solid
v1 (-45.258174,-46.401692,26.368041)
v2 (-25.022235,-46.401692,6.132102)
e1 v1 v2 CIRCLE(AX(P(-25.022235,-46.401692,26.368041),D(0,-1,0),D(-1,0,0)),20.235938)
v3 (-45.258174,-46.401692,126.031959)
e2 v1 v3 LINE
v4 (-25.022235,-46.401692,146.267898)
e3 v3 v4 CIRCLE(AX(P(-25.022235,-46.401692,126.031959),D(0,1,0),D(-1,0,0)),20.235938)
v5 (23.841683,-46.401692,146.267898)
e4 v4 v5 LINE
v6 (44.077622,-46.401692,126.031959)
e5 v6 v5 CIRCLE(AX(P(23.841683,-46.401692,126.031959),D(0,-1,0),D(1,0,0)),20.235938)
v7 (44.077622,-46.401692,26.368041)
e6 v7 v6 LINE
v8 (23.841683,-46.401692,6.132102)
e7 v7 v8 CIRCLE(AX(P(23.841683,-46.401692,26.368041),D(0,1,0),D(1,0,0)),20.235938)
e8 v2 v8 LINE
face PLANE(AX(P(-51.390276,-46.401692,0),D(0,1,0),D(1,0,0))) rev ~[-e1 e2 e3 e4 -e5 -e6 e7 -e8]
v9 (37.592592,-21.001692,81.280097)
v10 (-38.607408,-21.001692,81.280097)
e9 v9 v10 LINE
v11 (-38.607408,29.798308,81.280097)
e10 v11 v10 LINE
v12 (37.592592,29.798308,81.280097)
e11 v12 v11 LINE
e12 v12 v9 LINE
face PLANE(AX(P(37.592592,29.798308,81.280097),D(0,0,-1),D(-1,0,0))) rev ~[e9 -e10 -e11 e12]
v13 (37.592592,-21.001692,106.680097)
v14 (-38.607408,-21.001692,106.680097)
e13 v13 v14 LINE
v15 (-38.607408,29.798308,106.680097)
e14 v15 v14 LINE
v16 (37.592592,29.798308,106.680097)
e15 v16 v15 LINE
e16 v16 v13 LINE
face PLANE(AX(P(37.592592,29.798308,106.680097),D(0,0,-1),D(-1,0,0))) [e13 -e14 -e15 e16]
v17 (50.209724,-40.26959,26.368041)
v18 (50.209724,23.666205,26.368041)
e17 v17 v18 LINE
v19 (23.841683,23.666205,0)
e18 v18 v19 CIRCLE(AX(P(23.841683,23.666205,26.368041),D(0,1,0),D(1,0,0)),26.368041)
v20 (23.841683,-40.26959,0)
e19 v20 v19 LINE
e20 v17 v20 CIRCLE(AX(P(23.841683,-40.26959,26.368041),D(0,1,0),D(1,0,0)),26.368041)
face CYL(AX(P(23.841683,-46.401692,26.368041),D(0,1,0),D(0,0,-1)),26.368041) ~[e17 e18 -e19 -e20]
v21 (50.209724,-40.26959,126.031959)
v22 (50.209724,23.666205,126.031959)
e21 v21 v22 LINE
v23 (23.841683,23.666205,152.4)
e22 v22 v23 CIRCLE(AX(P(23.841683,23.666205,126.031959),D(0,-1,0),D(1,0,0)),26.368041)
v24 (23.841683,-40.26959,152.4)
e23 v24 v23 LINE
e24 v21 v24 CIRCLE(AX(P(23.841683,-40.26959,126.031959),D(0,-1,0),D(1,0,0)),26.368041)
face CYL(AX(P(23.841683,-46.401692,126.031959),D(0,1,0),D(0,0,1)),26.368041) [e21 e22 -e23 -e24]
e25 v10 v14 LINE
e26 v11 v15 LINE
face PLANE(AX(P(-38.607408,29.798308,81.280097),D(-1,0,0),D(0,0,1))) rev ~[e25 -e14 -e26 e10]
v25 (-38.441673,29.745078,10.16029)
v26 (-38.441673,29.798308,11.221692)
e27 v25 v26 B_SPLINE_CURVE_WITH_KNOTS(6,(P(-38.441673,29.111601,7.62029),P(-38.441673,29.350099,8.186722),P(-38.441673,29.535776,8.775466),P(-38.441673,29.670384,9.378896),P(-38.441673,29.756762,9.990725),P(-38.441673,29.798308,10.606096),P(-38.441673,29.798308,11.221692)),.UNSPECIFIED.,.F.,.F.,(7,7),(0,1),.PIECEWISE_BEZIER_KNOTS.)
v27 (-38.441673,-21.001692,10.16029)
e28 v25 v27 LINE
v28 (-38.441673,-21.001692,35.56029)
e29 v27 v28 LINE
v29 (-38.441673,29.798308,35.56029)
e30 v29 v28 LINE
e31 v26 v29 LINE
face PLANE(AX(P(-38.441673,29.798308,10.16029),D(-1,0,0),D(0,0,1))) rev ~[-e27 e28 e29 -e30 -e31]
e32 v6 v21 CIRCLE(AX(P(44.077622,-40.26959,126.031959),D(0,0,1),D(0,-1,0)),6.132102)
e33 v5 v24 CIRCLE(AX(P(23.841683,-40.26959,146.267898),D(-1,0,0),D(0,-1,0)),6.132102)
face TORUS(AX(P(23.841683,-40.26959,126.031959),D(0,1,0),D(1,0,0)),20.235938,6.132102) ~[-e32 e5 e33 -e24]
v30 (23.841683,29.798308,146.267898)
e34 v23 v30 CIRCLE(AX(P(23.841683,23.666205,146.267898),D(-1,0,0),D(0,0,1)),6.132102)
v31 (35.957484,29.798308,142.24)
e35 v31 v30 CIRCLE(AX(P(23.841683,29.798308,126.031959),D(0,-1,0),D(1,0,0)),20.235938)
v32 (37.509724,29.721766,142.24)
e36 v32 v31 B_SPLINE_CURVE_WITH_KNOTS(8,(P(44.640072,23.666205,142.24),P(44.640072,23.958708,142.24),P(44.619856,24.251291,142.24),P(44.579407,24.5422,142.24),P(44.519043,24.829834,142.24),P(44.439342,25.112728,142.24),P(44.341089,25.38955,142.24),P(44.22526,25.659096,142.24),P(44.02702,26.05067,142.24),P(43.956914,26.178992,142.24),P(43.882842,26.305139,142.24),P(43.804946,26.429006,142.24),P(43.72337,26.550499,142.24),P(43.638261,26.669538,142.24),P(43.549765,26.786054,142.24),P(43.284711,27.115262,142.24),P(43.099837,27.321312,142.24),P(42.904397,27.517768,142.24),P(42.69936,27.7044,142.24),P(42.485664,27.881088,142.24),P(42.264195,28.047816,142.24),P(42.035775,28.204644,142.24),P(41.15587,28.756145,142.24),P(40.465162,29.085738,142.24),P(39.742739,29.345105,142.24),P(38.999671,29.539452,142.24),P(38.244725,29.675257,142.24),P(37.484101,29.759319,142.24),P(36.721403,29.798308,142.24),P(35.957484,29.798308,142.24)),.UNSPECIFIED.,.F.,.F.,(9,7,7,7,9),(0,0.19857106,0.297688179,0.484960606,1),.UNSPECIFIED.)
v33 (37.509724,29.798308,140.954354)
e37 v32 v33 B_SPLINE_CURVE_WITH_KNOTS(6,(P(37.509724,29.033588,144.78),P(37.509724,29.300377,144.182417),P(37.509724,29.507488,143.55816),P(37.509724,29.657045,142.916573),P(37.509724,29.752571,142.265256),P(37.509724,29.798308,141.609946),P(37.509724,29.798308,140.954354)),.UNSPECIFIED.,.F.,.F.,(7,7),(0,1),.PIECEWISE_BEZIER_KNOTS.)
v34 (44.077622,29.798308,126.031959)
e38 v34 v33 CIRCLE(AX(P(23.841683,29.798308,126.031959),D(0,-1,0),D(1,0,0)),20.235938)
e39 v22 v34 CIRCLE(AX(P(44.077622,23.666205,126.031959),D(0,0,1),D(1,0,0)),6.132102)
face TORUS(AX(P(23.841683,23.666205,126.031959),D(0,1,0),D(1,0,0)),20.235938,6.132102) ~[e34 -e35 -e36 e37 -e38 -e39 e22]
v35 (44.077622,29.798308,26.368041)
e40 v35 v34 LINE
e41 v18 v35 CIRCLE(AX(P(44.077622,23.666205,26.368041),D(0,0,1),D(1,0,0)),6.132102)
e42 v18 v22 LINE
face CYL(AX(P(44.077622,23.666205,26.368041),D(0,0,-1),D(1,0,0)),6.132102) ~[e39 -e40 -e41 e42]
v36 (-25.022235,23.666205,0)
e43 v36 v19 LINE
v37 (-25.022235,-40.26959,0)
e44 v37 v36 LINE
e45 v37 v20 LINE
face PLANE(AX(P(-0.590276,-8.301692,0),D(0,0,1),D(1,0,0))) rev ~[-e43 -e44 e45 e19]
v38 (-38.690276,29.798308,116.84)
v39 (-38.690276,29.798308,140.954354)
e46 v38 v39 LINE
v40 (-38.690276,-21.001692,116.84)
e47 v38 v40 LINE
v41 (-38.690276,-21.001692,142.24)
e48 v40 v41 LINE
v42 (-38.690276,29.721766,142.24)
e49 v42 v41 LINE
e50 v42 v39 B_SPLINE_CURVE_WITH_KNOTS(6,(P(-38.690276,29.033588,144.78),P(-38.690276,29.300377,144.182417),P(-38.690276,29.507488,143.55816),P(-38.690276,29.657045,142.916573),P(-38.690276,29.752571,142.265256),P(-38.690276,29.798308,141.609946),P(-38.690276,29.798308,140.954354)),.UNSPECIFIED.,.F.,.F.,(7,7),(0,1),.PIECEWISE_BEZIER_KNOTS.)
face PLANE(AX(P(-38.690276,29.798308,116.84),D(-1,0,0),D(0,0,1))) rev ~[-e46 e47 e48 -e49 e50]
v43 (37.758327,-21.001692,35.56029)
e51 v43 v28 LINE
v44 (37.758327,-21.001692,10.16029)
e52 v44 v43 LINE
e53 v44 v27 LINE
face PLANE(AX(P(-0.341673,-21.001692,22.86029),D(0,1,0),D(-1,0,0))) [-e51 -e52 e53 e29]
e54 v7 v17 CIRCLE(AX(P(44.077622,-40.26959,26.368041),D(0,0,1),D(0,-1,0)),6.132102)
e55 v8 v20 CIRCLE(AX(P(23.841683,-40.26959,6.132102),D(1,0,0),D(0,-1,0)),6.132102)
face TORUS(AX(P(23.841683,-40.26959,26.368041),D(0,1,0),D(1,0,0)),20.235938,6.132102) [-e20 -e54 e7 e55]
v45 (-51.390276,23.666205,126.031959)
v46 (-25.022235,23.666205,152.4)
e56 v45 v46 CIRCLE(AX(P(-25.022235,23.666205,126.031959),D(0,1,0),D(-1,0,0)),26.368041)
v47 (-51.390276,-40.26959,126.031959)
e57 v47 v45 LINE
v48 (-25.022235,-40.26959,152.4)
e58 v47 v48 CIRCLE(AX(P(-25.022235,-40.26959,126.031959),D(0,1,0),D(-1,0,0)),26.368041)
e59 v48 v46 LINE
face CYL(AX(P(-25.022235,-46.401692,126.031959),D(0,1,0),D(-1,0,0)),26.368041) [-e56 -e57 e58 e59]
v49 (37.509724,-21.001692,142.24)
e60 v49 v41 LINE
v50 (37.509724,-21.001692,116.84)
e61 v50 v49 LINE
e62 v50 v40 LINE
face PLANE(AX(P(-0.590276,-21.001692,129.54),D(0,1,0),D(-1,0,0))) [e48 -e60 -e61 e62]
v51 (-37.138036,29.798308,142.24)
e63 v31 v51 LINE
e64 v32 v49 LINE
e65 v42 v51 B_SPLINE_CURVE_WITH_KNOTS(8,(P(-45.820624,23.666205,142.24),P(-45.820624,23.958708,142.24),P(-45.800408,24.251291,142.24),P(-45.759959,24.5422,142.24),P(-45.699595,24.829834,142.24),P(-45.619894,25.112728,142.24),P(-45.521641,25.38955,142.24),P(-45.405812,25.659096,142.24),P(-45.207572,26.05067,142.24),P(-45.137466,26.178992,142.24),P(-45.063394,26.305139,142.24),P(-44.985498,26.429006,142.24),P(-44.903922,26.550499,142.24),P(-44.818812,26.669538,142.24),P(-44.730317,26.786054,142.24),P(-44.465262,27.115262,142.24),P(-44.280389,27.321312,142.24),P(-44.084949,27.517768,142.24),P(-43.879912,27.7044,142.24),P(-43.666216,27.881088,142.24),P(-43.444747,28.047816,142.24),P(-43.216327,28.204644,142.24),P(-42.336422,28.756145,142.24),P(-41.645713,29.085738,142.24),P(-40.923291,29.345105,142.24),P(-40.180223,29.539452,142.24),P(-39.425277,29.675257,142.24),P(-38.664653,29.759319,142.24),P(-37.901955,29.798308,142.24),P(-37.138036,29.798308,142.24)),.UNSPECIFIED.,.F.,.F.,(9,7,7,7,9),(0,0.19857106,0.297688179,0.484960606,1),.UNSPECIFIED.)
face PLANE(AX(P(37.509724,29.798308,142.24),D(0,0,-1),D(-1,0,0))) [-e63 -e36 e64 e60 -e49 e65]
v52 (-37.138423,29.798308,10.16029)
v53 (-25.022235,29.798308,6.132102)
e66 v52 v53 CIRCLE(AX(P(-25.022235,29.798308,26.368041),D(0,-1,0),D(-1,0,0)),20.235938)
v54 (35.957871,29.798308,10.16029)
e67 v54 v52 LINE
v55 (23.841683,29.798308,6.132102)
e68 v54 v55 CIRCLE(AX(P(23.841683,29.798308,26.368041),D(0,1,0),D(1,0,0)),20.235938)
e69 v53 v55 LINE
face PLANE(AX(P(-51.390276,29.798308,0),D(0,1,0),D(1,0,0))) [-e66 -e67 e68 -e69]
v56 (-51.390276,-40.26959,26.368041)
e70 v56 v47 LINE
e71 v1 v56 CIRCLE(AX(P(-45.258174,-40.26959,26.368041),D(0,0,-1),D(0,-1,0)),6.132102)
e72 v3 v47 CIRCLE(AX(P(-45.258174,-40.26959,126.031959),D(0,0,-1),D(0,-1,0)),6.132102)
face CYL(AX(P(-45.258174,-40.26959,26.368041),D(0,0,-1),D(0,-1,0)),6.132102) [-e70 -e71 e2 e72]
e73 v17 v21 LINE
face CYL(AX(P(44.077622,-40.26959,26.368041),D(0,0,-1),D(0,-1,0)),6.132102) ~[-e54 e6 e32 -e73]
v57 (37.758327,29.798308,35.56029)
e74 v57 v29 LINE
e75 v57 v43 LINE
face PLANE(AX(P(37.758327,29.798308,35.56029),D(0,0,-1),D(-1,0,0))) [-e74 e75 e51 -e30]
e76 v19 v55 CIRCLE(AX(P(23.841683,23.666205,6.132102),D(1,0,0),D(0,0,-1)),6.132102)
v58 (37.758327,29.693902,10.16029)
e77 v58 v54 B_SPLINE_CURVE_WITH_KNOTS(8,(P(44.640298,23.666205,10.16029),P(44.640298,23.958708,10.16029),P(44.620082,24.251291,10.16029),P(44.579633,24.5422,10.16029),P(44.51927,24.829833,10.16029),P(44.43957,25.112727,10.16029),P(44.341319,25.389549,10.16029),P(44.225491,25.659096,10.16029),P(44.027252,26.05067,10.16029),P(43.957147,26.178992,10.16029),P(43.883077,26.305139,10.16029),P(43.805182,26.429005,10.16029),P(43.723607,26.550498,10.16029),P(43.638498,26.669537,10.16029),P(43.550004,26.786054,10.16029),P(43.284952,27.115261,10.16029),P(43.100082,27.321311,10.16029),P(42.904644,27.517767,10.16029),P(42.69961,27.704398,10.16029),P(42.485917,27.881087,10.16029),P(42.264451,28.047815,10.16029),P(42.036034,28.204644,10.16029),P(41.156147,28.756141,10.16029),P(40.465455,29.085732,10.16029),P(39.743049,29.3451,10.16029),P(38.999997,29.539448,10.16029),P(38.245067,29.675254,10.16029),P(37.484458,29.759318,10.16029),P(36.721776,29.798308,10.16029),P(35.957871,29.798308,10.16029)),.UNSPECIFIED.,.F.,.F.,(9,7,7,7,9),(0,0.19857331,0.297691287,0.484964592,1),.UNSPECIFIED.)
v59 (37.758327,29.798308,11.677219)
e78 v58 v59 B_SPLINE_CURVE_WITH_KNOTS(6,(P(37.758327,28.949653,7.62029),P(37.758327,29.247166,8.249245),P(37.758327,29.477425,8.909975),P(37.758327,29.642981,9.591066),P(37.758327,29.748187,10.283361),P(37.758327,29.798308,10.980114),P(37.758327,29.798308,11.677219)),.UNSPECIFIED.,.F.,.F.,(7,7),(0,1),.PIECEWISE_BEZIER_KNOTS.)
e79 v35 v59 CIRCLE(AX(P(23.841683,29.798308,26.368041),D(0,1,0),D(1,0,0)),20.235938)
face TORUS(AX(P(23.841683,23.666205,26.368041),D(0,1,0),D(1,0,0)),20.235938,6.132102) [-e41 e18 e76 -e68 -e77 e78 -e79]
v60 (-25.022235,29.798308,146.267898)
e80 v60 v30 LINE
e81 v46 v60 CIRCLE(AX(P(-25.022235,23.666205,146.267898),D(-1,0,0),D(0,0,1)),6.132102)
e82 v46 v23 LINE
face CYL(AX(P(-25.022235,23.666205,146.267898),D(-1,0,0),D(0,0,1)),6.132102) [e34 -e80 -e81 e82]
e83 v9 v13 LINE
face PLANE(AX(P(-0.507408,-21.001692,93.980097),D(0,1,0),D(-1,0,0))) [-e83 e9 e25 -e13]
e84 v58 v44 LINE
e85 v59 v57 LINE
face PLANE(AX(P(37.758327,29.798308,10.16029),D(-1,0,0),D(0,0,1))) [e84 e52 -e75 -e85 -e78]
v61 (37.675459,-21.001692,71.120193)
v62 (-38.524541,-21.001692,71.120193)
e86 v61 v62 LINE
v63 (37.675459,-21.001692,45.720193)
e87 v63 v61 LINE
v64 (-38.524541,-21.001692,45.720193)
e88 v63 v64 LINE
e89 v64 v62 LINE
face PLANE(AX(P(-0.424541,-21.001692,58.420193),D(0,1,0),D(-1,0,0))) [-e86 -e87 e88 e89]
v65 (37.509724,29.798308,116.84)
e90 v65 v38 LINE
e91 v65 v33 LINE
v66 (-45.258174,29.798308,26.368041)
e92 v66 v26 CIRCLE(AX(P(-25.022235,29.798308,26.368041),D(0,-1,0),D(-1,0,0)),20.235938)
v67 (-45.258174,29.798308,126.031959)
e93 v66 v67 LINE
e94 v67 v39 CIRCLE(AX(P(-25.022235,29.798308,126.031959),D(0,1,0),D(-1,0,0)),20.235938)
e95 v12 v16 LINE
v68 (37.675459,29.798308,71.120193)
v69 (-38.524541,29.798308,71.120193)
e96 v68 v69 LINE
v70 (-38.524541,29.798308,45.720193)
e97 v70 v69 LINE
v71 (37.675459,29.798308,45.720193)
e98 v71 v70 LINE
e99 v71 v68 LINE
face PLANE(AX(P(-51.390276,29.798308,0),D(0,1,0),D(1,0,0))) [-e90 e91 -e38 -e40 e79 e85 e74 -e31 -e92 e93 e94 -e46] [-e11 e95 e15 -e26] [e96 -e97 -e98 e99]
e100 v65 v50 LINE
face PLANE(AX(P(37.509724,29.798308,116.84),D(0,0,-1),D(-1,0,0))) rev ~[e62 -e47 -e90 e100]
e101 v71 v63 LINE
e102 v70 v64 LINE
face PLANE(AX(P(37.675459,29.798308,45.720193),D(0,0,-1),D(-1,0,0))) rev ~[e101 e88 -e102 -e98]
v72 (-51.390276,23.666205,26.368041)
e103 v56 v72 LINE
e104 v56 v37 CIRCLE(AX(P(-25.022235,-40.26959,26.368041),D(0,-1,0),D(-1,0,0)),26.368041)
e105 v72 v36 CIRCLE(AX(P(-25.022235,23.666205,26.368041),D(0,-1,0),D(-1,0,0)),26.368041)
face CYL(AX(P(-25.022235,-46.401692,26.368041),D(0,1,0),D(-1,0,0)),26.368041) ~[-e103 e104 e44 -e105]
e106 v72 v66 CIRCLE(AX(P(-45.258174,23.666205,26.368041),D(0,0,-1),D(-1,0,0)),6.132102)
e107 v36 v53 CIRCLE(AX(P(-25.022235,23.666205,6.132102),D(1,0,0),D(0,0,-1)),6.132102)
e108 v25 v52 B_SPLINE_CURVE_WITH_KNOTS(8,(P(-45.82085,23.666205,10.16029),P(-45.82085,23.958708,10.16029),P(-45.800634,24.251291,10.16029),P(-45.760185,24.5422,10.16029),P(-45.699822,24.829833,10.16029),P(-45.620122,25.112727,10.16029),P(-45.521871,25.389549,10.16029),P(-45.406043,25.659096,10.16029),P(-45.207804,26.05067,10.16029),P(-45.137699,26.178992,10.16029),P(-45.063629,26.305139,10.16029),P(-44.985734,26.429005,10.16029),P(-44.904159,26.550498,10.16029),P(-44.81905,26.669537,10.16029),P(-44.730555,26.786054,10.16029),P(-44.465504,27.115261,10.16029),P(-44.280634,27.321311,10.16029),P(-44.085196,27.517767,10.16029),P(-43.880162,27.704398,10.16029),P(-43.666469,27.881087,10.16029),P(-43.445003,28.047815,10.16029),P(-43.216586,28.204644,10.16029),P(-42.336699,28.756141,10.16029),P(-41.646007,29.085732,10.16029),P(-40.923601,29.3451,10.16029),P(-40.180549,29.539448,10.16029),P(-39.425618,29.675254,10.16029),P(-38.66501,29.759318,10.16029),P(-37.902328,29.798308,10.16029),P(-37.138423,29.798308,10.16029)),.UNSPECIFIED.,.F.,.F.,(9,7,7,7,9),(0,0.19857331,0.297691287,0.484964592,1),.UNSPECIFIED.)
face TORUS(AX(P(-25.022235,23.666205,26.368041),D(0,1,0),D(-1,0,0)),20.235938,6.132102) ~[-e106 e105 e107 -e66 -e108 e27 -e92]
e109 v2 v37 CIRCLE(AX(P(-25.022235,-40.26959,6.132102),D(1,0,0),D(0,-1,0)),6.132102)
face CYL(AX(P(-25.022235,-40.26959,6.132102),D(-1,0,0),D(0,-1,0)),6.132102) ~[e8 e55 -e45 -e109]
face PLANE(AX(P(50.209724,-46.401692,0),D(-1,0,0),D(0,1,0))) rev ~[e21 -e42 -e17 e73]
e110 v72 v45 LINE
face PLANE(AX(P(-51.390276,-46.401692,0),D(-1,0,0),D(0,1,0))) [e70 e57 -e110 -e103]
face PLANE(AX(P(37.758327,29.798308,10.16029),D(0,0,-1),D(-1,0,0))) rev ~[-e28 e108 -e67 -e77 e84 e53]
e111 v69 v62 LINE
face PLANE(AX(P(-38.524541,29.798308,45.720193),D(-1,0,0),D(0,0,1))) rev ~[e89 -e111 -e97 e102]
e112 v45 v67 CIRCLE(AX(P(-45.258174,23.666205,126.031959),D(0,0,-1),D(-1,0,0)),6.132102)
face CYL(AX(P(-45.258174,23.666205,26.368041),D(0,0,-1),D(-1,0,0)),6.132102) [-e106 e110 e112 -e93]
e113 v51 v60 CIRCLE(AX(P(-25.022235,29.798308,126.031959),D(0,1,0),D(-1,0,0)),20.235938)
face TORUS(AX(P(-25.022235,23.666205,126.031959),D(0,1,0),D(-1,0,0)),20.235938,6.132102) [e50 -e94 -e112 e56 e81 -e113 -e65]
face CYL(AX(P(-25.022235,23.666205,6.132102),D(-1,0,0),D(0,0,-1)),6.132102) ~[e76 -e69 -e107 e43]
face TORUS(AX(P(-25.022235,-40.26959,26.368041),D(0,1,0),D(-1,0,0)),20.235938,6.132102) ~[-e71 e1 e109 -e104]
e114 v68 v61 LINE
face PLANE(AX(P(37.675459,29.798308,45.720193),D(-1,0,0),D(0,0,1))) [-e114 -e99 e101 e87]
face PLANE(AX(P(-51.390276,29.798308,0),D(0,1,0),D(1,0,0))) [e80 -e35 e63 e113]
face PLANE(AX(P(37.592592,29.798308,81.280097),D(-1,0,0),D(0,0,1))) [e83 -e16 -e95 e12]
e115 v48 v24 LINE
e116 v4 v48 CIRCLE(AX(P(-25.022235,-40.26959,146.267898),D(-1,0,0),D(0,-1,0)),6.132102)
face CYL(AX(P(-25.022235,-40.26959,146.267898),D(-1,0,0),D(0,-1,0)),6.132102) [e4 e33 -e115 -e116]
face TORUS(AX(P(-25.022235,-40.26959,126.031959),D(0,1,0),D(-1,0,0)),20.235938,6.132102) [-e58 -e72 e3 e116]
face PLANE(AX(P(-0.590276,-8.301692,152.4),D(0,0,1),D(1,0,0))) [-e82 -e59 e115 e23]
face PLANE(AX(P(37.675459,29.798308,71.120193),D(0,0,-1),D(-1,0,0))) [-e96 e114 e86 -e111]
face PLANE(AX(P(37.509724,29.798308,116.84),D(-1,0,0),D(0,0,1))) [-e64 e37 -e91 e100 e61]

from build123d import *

# Parameters (mm, degrees)
F0_W         = 101.6
F0_H         = 76.2
F1_DEPTH     = 152.4
F2_W         = 76.2
F2_H         = 25.4
F3_DEPTH     = 50.8
F4_R         = 26.3680405282
F5_T1_DEPTH  = 48.8639189435
F5_T3_DEPTH  = 99.6639189435
F5_T6_ANGLE  = 90
F5_T8_ANGLE  = 90
F5_T10_ANGLE = 90
F5_T12_ANGLE = 90
F5_T14_ANGLE = 90
F5_T16_ANGLE = 90
F5_T18_ANGLE = 90
F5_T20_ANGLE = 90


# Not quite as in the source:
# - a fillet or chamfer that OpenCascade refuses, or shapes differently, is made with other operations: its cross-section is extruded or revolved along the edge and cut away or added


with BuildPart() as f1:
    # F0 (on Top) → F1 (new body)
    with BuildSketch(Plane.XY):
        with Locations((-0.5902759731, -8.3016921655)):
            Rectangle(F0_W, F0_H)
    extrude(amount=F1_DEPTH)

    # F2 (on face) → F3 (cut)
    with BuildSketch(Plane(origin=(0, 29.7983078345, 0), x_dir=(-1, 0, 0), z_dir=(0, 1, 0))):
        with Locations((0.5902759731, 129.54)):
            Rectangle(F2_W, F2_H)
        with Locations((0.5074083115, 93.9800965559)):
            Rectangle(F2_W, F2_H)
        with Locations((0.42454065, 58.4201931119)):
            Rectangle(F2_W, F2_H)
        with Locations((0.3416729884, 22.8602896678)):
            Rectangle(F2_W, F2_H)
    extrude(amount=-F3_DEPTH, mode=Mode.SUBTRACT)

    # F4
    f4_edges = [f1.edges().sort_by_distance(p)[0] for p in [
        (-51.390276, -8.301692, 152.4),
        (50.209724, -8.301692, 152.4),
        (-51.390276, -8.301692, 0),
        (50.209724, -8.301692, 0),
    ]]
    fillet(f4_edges, radius=F4_R)

    # F5: fillet of radius 6.1321024484 on 16 edges, made by hand

    # F5_s2 → F5_t1 (cut)
    with BuildSketch(Plane.YZ.offset(-25.0222354448)):
        with BuildLine():
            ThreePointArc((23.6662053861, 152.4), (28.0022566103, 150.6039487758), (29.7983078345, 146.2678975516))
            Line((29.7983078345, 146.2678975516), (29.7983078345, 152.4))
            Line((29.7983078345, 152.4), (23.6662053861, 152.4))
        make_face()
        with BuildLine():
            ThreePointArc((-46.4016921655, 146.2678975516), (-44.6056409413, 150.6039487758), (-40.2695897171, 152.4))
            Line((-40.2695897171, 152.4), (-46.4016921655, 152.4))
            Line((-46.4016921655, 152.4), (-46.4016921655, 146.2678975516))
        make_face()
        with BuildLine():
            ThreePointArc((23.6662053861, 0), (28.0022566103, 1.7960512242), (29.7983078345, 6.1321024484))
            Line((29.7983078345, 6.1321024484), (29.7983078345, 0))
            Line((29.7983078345, 0), (23.6662053861, 0))
        make_face()
        with BuildLine():
            ThreePointArc((-46.4016921655, 6.1321024484), (-44.6056409413, 1.7960512242), (-40.2695897171, 0))
            Line((-40.2695897171, 0), (-46.4016921655, 0))
            Line((-46.4016921655, 0), (-46.4016921655, 6.1321024484))
        make_face()
    extrude(amount=F5_T1_DEPTH, mode=Mode.SUBTRACT)

    # F5_s4 → F5_t3 (cut)
    with BuildSketch(Plane.XY.offset(26.3680405282)):
        with BuildLine():
            ThreePointArc((-45.2581735247, -46.4016921655), (-49.5942247489, -44.6056409413), (-51.3902759731, -40.2695897171))
            Line((-51.3902759731, -40.2695897171), (-51.3902759731, -46.4016921655))
            Line((-51.3902759731, -46.4016921655), (-45.2581735247, -46.4016921655))
        make_face()
        with BuildLine():
            ThreePointArc((44.0776215785, -46.4016921655), (48.4136728027, -44.6056409413), (50.2097240269, -40.2695897171))
            Line((50.2097240269, -40.2695897171), (50.2097240269, -46.4016921655))
            Line((50.2097240269, -46.4016921655), (44.0776215785, -46.4016921655))
        make_face()
        with BuildLine():
            ThreePointArc((-51.3902759731, 23.6662053861), (-49.5942247489, 28.0022566103), (-45.2581735247, 29.7983078345))
            Line((-45.2581735247, 29.7983078345), (-51.3902759731, 29.7983078345))
            Line((-51.3902759731, 29.7983078345), (-51.3902759731, 23.6662053861))
        make_face()
        with BuildLine():
            ThreePointArc((50.2097240269, 23.6662053861), (48.4136728027, 28.0022566103), (44.0776215785, 29.7983078345))
            Line((44.0776215785, 29.7983078345), (50.2097240269, 29.7983078345))
            Line((50.2097240269, 29.7983078345), (50.2097240269, 23.6662053861))
        make_face()
    extrude(amount=F5_T3_DEPTH, mode=Mode.SUBTRACT)

    # F5_s5 → F5_t6 (revolve, cut)
    with BuildSketch(Plane.XY.offset(26.3680405282)):
        with BuildLine():
            ThreePointArc((-45.2581735247, -46.4016921655), (-49.5942247489, -44.6056409413), (-51.3902759731, -40.2695897171))
            Line((-51.3902759731, -40.2695897171), (-51.3902759731, -46.4016921655))
            Line((-51.3902759731, -46.4016921655), (-45.2581735247, -46.4016921655))
        make_face()
    revolve(axis=Axis((-25.0222354448, -46.4016921655, 26.3680405282), (0, -1, 0)), revolution_arc=F5_T6_ANGLE, mode=Mode.SUBTRACT)

    # F5_s7 → F5_t8 (revolve, cut)
    with BuildSketch(Plane.XY.offset(126.0319594718)):
        with BuildLine():
            ThreePointArc((-45.2581735247, -46.4016921655), (-49.5942247489, -44.6056409413), (-51.3902759731, -40.2695897171))
            Line((-51.3902759731, -40.2695897171), (-51.3902759731, -46.4016921655))
            Line((-51.3902759731, -46.4016921655), (-45.2581735247, -46.4016921655))
        make_face()
    revolve(axis=Axis((-25.0222354448, -46.4016921655, 126.0319594718), (0, 1, 0)), revolution_arc=F5_T8_ANGLE, mode=Mode.SUBTRACT)

    # F5_s9 → F5_t10 (revolve, cut)
    with BuildSketch(Plane.XY.offset(26.3680405282)):
        with BuildLine():
            ThreePointArc((44.0776215785, -46.4016921655), (48.4136728027, -44.6056409413), (50.2097240269, -40.2695897171))
            Line((50.2097240269, -40.2695897171), (50.2097240269, -46.4016921655))
            Line((50.2097240269, -46.4016921655), (44.0776215785, -46.4016921655))
        make_face()
    revolve(axis=Axis((23.8416834987, -46.4016921655, 26.3680405282), (0, 1, 0)), revolution_arc=F5_T10_ANGLE, mode=Mode.SUBTRACT)

    # F5_s11 → F5_t12 (revolve, cut)
    with BuildSketch(Plane.XY.offset(126.0319594718)):
        with BuildLine():
            ThreePointArc((44.0776215785, -46.4016921655), (48.4136728027, -44.6056409413), (50.2097240269, -40.2695897171))
            Line((50.2097240269, -40.2695897171), (50.2097240269, -46.4016921655))
            Line((50.2097240269, -46.4016921655), (44.0776215785, -46.4016921655))
        make_face()
    revolve(axis=Axis((23.8416834987, -46.4016921655, 126.0319594718), (0, -1, 0)), revolution_arc=F5_T12_ANGLE, mode=Mode.SUBTRACT)

    # F5_s13 → F5_t14 (revolve, cut)
    with BuildSketch(Plane.XY.offset(26.3680405282)):
        with BuildLine():
            ThreePointArc((-51.3902759731, 23.6662053861), (-49.5942247489, 28.0022566103), (-45.2581735247, 29.7983078345))
            Line((-45.2581735247, 29.7983078345), (-51.3902759731, 29.7983078345))
            Line((-51.3902759731, 29.7983078345), (-51.3902759731, 23.6662053861))
        make_face()
    revolve(axis=Axis((-25.0222354448, 29.7983078345, 26.3680405282), (0, -1, 0)), revolution_arc=F5_T14_ANGLE, mode=Mode.SUBTRACT)

    # F5_s15 → F5_t16 (revolve, cut)
    with BuildSketch(Plane.XY.offset(126.0319594718)):
        with BuildLine():
            ThreePointArc((-51.3902759731, 23.6662053861), (-49.5942247489, 28.0022566103), (-45.2581735247, 29.7983078345))
            Line((-45.2581735247, 29.7983078345), (-51.3902759731, 29.7983078345))
            Line((-51.3902759731, 29.7983078345), (-51.3902759731, 23.6662053861))
        make_face()
    revolve(axis=Axis((-25.0222354448, 29.7983078345, 126.0319594718), (0, 1, 0)), revolution_arc=F5_T16_ANGLE, mode=Mode.SUBTRACT)

    # F5_s17 → F5_t18 (revolve, cut)
    with BuildSketch(Plane.XY.offset(26.3680405282)):
        with BuildLine():
            ThreePointArc((50.2097240269, 23.6662053861), (48.4136728027, 28.0022566103), (44.0776215785, 29.7983078345))
            Line((44.0776215785, 29.7983078345), (50.2097240269, 29.7983078345))
            Line((50.2097240269, 29.7983078345), (50.2097240269, 23.6662053861))
        make_face()
    revolve(axis=Axis((23.8416834987, 29.7983078345, 26.3680405282), (0, 1, 0)), revolution_arc=F5_T18_ANGLE, mode=Mode.SUBTRACT)

    # F5_s19 → F5_t20 (revolve, cut)
    with BuildSketch(Plane.XY.offset(126.0319594718)):
        with BuildLine():
            ThreePointArc((50.2097240269, 23.6662053861), (48.4136728027, 28.0022566103), (44.0776215785, 29.7983078345))
            Line((44.0776215785, 29.7983078345), (50.2097240269, 29.7983078345))
            Line((50.2097240269, 29.7983078345), (50.2097240269, 23.6662053861))
        make_face()
    revolve(axis=Axis((23.8416834987, 29.7983078345, 126.0319594718), (0, -1, 0)), revolution_arc=F5_T20_ANGLE, mode=Mode.SUBTRACT)


solid = f1.part
